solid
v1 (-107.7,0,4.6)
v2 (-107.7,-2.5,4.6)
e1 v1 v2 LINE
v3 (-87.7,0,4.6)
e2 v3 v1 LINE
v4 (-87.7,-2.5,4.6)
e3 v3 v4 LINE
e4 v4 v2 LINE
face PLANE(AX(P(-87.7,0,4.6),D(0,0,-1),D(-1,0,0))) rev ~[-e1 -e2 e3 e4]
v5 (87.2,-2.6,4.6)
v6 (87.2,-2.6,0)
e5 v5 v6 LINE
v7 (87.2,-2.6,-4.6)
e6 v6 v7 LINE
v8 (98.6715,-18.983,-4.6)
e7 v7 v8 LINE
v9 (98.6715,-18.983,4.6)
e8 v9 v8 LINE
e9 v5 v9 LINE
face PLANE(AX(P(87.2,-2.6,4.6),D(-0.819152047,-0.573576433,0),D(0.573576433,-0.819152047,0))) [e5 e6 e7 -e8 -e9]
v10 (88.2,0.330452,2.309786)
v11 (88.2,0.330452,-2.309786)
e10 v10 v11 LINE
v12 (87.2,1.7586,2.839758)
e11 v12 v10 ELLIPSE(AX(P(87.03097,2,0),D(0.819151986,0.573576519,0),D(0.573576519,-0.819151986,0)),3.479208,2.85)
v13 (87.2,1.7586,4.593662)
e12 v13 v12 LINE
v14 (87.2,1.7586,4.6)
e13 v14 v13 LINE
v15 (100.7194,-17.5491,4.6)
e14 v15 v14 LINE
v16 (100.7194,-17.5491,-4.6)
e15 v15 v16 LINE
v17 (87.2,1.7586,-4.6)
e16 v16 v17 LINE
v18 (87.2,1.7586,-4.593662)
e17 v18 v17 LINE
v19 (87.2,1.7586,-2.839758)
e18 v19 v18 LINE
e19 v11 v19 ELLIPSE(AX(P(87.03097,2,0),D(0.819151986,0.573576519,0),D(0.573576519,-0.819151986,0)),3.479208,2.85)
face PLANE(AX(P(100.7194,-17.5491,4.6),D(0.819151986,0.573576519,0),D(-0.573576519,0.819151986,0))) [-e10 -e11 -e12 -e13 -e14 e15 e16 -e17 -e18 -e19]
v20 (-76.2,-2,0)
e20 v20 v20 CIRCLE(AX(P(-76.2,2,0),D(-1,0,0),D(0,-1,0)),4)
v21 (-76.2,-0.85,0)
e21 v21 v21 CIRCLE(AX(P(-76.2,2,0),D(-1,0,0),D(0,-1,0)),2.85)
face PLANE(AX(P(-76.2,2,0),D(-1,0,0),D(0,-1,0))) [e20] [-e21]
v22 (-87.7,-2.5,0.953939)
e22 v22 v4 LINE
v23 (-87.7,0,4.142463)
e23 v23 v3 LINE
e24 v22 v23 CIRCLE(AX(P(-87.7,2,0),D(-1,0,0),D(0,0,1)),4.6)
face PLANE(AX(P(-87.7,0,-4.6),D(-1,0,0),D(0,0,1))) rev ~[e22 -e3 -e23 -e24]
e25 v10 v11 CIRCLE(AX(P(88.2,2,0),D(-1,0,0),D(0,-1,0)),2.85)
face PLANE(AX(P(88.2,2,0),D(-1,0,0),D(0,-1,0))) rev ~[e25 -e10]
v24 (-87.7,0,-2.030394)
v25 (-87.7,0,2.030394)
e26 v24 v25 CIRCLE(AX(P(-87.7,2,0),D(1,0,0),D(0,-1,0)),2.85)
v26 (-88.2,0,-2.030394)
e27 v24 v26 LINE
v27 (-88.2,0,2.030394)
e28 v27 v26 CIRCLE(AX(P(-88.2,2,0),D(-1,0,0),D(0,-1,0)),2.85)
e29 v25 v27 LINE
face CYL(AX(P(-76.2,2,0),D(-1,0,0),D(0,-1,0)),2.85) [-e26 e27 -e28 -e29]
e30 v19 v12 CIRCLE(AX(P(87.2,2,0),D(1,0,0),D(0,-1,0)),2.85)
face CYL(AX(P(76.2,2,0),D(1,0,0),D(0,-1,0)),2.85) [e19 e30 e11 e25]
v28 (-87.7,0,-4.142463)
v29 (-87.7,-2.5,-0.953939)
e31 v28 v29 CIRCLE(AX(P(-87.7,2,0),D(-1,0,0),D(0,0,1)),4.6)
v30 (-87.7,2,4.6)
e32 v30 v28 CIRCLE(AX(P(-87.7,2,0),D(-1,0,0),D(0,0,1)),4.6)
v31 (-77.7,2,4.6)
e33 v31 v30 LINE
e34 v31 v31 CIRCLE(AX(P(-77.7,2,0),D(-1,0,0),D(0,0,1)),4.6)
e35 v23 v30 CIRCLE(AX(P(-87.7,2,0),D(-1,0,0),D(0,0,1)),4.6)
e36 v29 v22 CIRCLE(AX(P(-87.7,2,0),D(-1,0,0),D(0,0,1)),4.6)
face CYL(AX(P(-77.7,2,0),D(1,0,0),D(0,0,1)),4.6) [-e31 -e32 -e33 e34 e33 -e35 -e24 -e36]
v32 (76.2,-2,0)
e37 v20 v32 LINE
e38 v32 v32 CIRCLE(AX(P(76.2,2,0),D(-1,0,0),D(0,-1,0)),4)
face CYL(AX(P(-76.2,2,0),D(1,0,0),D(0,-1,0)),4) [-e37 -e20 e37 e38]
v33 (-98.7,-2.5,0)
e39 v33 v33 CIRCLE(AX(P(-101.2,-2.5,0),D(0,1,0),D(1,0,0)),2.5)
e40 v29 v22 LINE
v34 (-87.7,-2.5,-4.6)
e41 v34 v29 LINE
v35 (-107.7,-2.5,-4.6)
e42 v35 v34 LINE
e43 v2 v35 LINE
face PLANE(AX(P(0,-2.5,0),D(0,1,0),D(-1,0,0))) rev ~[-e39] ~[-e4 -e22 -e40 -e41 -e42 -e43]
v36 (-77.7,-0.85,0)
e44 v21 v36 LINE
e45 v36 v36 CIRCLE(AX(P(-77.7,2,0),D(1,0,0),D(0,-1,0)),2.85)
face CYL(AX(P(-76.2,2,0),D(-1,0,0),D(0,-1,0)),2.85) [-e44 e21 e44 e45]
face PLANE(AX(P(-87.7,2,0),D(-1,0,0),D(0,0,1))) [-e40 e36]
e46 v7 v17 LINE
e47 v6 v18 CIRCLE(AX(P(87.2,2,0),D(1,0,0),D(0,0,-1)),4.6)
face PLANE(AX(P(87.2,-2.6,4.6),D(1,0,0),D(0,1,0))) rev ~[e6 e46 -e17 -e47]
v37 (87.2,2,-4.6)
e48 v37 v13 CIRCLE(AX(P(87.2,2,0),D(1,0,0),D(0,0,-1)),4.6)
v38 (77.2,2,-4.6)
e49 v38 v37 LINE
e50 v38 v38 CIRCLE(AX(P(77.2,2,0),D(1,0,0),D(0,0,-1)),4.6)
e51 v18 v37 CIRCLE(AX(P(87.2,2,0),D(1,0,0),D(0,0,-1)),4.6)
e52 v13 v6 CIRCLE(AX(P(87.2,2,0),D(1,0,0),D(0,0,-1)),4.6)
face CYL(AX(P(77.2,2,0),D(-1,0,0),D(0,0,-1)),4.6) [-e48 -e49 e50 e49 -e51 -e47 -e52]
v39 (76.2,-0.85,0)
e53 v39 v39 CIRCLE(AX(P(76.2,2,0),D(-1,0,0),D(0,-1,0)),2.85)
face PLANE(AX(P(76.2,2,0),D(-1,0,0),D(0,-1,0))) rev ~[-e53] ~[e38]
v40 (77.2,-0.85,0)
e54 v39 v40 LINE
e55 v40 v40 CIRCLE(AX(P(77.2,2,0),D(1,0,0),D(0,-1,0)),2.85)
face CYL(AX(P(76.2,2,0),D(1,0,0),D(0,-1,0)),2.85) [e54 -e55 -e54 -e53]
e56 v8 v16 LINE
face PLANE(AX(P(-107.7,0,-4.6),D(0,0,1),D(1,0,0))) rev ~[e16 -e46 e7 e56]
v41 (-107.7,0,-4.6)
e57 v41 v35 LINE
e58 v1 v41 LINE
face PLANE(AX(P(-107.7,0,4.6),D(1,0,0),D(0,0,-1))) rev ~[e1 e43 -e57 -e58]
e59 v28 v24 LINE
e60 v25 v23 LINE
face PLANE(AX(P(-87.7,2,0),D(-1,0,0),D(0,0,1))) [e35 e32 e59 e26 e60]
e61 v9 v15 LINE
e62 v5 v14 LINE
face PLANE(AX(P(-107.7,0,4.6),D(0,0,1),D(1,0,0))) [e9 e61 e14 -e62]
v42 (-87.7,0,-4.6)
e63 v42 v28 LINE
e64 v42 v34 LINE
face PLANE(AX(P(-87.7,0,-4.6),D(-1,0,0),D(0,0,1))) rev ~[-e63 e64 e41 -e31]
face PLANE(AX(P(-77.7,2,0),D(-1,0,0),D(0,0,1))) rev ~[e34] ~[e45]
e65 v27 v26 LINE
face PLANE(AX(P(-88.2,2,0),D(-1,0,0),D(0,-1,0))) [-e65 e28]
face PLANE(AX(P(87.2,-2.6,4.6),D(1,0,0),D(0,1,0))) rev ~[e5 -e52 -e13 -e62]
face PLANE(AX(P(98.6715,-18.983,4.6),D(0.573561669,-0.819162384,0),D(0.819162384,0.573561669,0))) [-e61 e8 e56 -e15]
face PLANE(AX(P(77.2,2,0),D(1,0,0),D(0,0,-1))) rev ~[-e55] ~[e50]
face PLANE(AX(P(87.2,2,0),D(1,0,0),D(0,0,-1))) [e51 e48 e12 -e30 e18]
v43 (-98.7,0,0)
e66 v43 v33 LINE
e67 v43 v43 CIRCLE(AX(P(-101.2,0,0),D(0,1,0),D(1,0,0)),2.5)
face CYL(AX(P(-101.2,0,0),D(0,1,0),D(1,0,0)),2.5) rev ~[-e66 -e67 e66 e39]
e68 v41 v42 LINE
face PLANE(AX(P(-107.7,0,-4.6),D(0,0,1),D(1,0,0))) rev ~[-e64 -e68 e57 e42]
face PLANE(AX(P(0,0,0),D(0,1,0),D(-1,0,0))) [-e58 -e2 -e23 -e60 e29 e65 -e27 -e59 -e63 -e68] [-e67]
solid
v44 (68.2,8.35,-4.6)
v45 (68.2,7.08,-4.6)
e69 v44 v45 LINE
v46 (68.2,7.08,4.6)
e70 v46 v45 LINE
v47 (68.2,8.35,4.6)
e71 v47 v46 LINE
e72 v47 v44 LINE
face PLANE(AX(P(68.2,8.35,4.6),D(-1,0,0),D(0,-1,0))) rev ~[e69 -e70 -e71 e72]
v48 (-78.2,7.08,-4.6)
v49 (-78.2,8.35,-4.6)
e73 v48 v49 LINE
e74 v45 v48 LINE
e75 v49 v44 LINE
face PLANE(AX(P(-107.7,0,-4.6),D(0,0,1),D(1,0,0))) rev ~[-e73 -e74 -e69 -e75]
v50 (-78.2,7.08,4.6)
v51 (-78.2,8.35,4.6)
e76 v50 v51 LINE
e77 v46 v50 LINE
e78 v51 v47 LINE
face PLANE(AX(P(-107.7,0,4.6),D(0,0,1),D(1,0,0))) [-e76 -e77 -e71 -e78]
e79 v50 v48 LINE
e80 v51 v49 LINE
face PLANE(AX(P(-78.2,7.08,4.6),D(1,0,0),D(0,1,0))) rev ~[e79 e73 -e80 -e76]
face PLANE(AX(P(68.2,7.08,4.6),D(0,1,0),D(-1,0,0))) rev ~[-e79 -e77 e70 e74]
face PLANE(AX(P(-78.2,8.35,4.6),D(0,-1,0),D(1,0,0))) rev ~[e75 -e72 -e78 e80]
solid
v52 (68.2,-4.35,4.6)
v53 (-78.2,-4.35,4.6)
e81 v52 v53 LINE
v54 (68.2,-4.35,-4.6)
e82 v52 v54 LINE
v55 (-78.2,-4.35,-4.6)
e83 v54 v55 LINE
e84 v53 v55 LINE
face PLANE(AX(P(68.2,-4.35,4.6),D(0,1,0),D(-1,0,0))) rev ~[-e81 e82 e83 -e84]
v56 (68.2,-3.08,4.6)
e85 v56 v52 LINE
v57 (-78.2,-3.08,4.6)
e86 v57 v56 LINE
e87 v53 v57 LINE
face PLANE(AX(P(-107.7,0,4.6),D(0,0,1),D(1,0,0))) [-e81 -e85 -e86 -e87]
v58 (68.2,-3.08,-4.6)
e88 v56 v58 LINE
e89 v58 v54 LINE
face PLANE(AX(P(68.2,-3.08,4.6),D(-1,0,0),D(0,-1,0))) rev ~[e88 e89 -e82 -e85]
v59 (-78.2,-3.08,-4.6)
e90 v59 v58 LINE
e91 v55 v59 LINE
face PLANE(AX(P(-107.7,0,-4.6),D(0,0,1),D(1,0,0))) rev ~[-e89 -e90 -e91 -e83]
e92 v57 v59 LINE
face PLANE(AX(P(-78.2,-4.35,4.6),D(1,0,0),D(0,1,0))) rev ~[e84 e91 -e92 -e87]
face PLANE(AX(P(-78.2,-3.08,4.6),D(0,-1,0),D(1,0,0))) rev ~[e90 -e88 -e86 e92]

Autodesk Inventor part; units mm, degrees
ref_plane "YZ Plane" through (0, 0, 0) normal (1, 0, 0) x (0, 1, 0)
sketch "Sketch1" plane through (0, 0, 0) normal (0, 0, 1) x (1, 0, 0)
  line L0 (-76.2, -2) -> (76.2, -2)
  line L1 (76.2, 2) -> (-76.2, 2)
  line L2 (-76.2, -2) -> (76.2, 2) construction
  line L3 (76.2, -2) -> (-76.2, 2) construction
  line L4 (-76.2, -2) -> (-76.2, -0.85)
  line L5 (-76.2, -0.85) -> (-88.2, -0.85)
  line L6 (-88.2, -0.85) -> (-88.2, 2)
  line L7 (-88.2, 2) -> (-76.2, 2)
  line L8 (76.2, -2) -> (76.2, -0.85)
  line L9 (76.2, -0.85) -> (88.2, -0.85)
  line L10 (88.2, -0.85) -> (88.2, 2)
  line L11 (88.2, 2) -> (76.2, 2)
  point P0 (0, 0)
  point P1 (0, 0)
  point P2 (0, 0)
  dimension "d3" = 4
  dimension "d4" = 2.85
  dimension "d5" = 12
  dimension "d6" = 152.4
revolve "Revolution1" add sketch "Sketch1" angle 360 about axis through (76.2, 2, 0) along (-1, 0, 0)
ref_plane "Work Plane1" through (-77.7, 2, 0) normal (-1, 0, 0) x (0, 0, 1)
sketch "Sketch2" plane through (-77.7, 2, 0) normal (-1, 0, 0) x (0, 0, 1)
  circle A0 centre (0, 0) radius 2.85 projected
  circle A1 centre (0, 0) radius 4.6
  point P0 (0, -2)
  dimension "d9" = 9.2
extrude "Extrusion1" add sketch "Sketch2" along normal blind 10
ref_plane "Work Plane2" through (77.2, 2, 0) normal (1, 0, 0) x (0, 0, -1)
sketch "Sketch3" plane through (77.2, 2, 0) normal (1, 0, 0) x (0, 0, -1)
  circle A0 centre (0, 0) radius 4.6 projected
  point P0 (0, -2)
extrude "Extrusion2" add sketch "Sketch3" along normal blind 10
sketch "Sketch4" plane through (0, 0, 0) normal (0, 1, 0) x (-1, 0, 0)
  line L0 (87.7, -4.6) -> (87.7, 4.6) projected
  line L1 (-87.2, 4.6) -> (-87.2, -4.6) projected
  line L2 (87.7, 4.6) -> (107.7, 4.6)
  line L3 (107.7, 4.6) -> (107.7, -4.6)
  line L4 (107.7, -4.6) -> (87.7, -4.6)
  point P0 (0, 0)
  dimension "d15" = 20
extrude "Extrusion3" add sketch "Sketch4" against normal blind 2.5
sketch "Sketch5" plane through (-107.7, 0, 4.6) normal (0, 0, 1) x (1, 0, 0)
  line L0 (194.9, -2.6) -> (194.9, 6.6) projected
  line L1 (194.9, -2.6) -> (206.3715, -18.983)
  line L2 (206.3715, -18.983) -> (208.4194, -17.5491)
  line L3 (208.4194, -17.5491) -> (194.9, 1.7586)
  line L4 (0, 0) -> (0, -2.5) construction
  line L5 (20, -2.5) -> (0, -2.5) construction
  point P0 (107.7, 0)
  dimension "d18" = 145
extrude "Extrusion4" add sketch "Sketch5" against normal up to surface (9.2 mm away)
sketch "Sketch6" plane through (-107.7, 0, 4.6) normal (0, 0, 1) x (1, 0, 0)
  line L0 (30, 6.6) -> (20, 6.6) construction
  line L1 (30, -2.6) -> (20, -2.6) construction
  line L2 (19.5, 4.85) -> (19.5, 0) construction
  line L3 (195.9, 4.85) -> (195.9, 0.3305) construction
  line L4 (29.5, 8.35) -> (175.9, 8.35)
  line L5 (175.9, 8.35) -> (175.9, 7.08)
  line L6 (175.9, 7.08) -> (29.5, 7.08)
  line L7 (29.5, 7.08) -> (29.5, 8.35)
  line L8 (29.5, -3.08) -> (175.9, -3.08)
  line L9 (175.9, -3.08) -> (175.9, -4.35)
  line L10 (175.9, -4.35) -> (29.5, -4.35)
  line L11 (29.5, -4.35) -> (29.5, -3.08)
  line L12 (25, -2.6) -> (25, -3.08) construction
  line L13 (25, 6.6) -> (25, 7.08) construction
  point P0 (107.7, 0)
  dimension "d21" = 12.7
  dimension "d22" = 1.27
  dimension "d23" = 20
  dimension "d26" = 10
extrude "Extrusion5" add sketch "Sketch6" against normal up to surface (9.2 mm away)
sketch "Sketch7" plane through (0, 0, 0) normal (0, 1, 0) x (1, 0, 0)
  line L0 (-88.2, 2.0304) -> (-88.2, -2.0304) construction
  line L1 (-88.2, 0) -> (-101.2, 0) construction
  circle A0 centre (-101.2, 0) radius 2.5
  point P0 (0, 0)
  dimension "d27" = 5
  dimension "d28" = 13
extrude "Extrusion6" cut sketch "Sketch7" against normal up to surface (2.5 mm away)
properties part number "Cable Primitive"
